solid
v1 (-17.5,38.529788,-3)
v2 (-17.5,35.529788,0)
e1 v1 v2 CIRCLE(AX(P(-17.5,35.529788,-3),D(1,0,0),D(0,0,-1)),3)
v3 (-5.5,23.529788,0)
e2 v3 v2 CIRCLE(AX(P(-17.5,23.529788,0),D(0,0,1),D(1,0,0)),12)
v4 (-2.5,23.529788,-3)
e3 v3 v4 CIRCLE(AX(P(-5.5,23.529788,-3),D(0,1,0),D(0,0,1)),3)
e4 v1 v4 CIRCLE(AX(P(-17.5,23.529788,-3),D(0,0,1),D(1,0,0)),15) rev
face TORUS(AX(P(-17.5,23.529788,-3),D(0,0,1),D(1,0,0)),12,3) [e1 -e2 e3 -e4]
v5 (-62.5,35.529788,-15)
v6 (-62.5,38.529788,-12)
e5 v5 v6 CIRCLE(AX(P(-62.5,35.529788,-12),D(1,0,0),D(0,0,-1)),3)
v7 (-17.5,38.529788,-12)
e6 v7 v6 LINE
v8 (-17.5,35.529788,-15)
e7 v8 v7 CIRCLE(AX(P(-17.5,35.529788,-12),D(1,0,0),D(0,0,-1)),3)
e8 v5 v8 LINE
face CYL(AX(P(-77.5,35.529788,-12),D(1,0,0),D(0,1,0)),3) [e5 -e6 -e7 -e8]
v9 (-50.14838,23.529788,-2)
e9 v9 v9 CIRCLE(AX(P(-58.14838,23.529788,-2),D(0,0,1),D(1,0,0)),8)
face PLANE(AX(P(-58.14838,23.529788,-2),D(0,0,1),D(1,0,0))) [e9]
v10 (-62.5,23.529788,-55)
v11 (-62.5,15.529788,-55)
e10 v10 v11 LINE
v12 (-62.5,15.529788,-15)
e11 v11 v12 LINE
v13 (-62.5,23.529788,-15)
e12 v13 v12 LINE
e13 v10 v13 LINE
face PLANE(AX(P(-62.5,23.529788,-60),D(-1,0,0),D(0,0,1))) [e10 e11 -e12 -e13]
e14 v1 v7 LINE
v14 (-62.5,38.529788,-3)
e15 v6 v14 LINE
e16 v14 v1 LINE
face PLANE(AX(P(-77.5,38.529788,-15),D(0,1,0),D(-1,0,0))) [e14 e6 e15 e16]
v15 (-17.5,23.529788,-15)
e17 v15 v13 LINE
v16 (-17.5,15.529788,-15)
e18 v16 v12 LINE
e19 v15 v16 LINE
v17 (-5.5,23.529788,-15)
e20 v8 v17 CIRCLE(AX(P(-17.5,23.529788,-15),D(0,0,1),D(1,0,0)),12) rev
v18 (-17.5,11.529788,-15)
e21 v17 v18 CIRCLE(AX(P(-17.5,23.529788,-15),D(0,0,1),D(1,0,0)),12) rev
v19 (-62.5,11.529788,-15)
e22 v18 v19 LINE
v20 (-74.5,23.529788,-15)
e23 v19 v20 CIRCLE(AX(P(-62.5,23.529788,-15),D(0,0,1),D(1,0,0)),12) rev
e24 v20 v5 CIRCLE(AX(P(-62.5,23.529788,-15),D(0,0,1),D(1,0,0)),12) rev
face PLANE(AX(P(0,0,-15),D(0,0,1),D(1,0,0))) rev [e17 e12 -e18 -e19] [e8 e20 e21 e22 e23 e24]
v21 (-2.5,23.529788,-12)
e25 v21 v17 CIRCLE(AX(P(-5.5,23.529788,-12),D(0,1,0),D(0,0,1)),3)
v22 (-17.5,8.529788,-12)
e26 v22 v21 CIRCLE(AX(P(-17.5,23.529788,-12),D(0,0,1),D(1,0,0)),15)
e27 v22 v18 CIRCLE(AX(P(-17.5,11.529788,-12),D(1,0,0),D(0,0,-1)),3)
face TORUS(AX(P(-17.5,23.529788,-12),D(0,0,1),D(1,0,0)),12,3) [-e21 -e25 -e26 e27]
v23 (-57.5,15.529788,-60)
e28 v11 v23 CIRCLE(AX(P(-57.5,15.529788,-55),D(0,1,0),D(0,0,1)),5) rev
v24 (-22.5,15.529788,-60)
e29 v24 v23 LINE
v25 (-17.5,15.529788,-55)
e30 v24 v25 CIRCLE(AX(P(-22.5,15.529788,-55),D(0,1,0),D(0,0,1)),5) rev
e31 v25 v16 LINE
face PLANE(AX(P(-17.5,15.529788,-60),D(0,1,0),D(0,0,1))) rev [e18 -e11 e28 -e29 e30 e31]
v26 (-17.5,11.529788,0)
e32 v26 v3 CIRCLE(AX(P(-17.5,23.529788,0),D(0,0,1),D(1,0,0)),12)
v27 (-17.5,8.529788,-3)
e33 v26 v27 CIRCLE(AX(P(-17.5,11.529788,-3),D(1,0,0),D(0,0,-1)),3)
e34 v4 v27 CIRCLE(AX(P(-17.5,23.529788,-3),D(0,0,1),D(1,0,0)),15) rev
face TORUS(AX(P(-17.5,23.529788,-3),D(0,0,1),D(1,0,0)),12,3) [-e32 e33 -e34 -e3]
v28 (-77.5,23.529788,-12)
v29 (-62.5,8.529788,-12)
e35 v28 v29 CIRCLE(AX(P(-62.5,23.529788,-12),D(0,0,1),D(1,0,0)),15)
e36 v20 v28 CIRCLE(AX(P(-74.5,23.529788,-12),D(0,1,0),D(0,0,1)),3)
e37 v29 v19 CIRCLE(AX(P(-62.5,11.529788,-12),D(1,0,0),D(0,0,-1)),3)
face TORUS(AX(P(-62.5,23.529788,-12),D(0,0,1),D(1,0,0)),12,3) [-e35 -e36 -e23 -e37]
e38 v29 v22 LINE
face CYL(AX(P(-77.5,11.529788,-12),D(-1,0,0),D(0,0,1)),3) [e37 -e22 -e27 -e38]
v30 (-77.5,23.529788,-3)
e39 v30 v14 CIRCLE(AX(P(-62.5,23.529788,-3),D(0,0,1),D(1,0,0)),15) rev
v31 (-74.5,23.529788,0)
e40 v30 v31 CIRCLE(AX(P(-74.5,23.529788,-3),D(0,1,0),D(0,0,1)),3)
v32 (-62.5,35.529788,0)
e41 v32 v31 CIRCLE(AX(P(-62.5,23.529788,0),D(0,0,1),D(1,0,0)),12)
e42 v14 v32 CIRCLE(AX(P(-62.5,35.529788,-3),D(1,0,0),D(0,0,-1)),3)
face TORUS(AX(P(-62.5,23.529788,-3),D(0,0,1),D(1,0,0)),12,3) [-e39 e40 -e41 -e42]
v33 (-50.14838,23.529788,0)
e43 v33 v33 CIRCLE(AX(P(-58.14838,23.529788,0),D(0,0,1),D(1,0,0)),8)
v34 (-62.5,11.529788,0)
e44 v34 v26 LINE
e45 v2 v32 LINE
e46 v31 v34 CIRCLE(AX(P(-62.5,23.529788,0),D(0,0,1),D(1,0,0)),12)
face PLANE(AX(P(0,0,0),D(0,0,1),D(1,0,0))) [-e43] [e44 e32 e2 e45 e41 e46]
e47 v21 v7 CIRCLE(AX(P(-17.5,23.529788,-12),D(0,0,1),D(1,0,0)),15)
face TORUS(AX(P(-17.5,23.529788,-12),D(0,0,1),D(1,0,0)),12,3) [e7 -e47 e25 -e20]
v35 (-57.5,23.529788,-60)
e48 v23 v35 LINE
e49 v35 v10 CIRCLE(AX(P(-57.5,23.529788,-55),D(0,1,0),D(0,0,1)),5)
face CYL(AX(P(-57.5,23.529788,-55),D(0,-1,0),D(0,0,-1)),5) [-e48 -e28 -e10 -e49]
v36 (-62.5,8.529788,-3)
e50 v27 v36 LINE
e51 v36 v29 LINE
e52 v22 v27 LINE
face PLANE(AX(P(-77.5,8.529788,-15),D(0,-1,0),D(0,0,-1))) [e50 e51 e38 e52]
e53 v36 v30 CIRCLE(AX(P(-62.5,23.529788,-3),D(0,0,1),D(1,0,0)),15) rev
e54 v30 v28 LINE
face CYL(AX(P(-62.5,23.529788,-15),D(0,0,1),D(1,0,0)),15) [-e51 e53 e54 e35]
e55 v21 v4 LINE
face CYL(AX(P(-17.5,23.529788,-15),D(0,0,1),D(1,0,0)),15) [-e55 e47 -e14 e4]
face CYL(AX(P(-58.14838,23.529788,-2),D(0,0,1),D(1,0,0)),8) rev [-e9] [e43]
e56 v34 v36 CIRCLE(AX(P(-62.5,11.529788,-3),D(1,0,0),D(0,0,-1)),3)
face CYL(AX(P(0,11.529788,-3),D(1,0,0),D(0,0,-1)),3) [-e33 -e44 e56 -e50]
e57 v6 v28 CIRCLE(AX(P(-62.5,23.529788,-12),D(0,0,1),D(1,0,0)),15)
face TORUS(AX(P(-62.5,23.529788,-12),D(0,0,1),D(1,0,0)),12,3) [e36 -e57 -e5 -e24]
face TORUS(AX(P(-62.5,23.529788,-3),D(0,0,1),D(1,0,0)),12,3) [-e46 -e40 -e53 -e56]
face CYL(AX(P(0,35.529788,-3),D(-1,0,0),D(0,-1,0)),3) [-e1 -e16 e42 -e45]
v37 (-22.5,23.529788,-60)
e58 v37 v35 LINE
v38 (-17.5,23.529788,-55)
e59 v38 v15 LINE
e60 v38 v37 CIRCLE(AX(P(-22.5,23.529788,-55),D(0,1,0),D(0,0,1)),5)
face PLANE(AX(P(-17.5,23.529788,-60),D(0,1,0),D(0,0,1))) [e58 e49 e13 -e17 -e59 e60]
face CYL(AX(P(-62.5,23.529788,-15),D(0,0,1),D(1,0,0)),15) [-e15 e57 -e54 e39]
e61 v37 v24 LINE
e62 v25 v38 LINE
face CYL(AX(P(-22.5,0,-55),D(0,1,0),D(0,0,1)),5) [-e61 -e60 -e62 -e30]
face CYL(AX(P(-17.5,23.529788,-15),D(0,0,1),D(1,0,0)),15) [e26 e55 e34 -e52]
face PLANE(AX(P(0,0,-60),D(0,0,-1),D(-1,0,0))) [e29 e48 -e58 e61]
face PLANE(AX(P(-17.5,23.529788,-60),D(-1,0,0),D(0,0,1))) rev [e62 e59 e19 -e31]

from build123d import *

# Parameters (mm, degrees)
SKETCH1_W           = 75
SKETCH1_H           = 30
BOSS_EXTRUDE1_DEPTH = 15
FILLET1_R           = 15
SKETCH2_W           = 45
SKETCH2_H           = 8
BOSS_EXTRUDE2_DEPTH = 45
FILLET2_R           = 5
FILLET3_R           = 3
SKETCH3_R           = 8
CUT_EXTRUDE1_DEPTH  = 2


with BuildPart() as part:
    # Sketch1 → Boss-Extrude1 (new body)
    with BuildSketch(Plane.XY):
        with Locations((-40, 23.52978815)):
            Rectangle(SKETCH1_W, SKETCH1_H)
    extrude(amount=-BOSS_EXTRUDE1_DEPTH)

    # Fillet1
    fillet1_edges = [part.edges().sort_by_distance(p)[0] for p in [
        (-77.5, 8.52978815, -7.5),
        (-77.5, 38.52978815, -7.5),
        (-2.5, 8.52978815, -7.5),
        (-2.5, 38.52978815, -7.5),
    ]]
    fillet(fillet1_edges, radius=FILLET1_R - 0.0001)  # a hair under: the kernel refuses the full size

    # Sketch2 → Boss-Extrude2 (add)
    with BuildSketch(Plane(origin=(0, 0, -15), x_dir=(-1, 0, 0), z_dir=(0, 0, -1))):
        with Locations((40, 19.52978815)):
            Rectangle(SKETCH2_W, SKETCH2_H)
    extrude(amount=BOSS_EXTRUDE2_DEPTH)

    # Fillet2
    fillet2_edges = [part.edges().sort_by_distance(p)[0] for p in [
        (-62.5, 19.52978815, -60),
        (-17.5, 19.52978815, -60),
    ]]
    fillet(fillet2_edges, radius=FILLET2_R)

    # Fillet3
    fillet3_edges = [part.edges().sort_by_distance(p)[0] for p in [
        (-40, 8.52978815, 0),
        (-40, 38.52978815, 0),
        (-6.893368993, 34.136419158, 0),
        (-6.893368993, 12.923157143, 0),
        (-73.106631007, 34.136419158, 0),
        (-73.106631007, 12.923157143, 0),
        (-40, 8.52978815, -15),
        (-40, 38.52978815, -15),
        (-6.893368993, 34.136419158, -15),
        (-6.893368993, 12.923157143, -15),
        (-73.106631007, 34.136419158, -15),
        (-73.106631007, 12.923157143, -15),
    ]]
    fillet(fillet3_edges, radius=FILLET3_R)

    # Sketch3 → Cut-Extrude1 (cut)
    with BuildSketch(Plane.XY):
        with Locations((-58.148379701, 23.52978815)):
            Circle(SKETCH3_R)
    extrude(amount=-CUT_EXTRUDE1_DEPTH, mode=Mode.SUBTRACT)


solid = part.part
